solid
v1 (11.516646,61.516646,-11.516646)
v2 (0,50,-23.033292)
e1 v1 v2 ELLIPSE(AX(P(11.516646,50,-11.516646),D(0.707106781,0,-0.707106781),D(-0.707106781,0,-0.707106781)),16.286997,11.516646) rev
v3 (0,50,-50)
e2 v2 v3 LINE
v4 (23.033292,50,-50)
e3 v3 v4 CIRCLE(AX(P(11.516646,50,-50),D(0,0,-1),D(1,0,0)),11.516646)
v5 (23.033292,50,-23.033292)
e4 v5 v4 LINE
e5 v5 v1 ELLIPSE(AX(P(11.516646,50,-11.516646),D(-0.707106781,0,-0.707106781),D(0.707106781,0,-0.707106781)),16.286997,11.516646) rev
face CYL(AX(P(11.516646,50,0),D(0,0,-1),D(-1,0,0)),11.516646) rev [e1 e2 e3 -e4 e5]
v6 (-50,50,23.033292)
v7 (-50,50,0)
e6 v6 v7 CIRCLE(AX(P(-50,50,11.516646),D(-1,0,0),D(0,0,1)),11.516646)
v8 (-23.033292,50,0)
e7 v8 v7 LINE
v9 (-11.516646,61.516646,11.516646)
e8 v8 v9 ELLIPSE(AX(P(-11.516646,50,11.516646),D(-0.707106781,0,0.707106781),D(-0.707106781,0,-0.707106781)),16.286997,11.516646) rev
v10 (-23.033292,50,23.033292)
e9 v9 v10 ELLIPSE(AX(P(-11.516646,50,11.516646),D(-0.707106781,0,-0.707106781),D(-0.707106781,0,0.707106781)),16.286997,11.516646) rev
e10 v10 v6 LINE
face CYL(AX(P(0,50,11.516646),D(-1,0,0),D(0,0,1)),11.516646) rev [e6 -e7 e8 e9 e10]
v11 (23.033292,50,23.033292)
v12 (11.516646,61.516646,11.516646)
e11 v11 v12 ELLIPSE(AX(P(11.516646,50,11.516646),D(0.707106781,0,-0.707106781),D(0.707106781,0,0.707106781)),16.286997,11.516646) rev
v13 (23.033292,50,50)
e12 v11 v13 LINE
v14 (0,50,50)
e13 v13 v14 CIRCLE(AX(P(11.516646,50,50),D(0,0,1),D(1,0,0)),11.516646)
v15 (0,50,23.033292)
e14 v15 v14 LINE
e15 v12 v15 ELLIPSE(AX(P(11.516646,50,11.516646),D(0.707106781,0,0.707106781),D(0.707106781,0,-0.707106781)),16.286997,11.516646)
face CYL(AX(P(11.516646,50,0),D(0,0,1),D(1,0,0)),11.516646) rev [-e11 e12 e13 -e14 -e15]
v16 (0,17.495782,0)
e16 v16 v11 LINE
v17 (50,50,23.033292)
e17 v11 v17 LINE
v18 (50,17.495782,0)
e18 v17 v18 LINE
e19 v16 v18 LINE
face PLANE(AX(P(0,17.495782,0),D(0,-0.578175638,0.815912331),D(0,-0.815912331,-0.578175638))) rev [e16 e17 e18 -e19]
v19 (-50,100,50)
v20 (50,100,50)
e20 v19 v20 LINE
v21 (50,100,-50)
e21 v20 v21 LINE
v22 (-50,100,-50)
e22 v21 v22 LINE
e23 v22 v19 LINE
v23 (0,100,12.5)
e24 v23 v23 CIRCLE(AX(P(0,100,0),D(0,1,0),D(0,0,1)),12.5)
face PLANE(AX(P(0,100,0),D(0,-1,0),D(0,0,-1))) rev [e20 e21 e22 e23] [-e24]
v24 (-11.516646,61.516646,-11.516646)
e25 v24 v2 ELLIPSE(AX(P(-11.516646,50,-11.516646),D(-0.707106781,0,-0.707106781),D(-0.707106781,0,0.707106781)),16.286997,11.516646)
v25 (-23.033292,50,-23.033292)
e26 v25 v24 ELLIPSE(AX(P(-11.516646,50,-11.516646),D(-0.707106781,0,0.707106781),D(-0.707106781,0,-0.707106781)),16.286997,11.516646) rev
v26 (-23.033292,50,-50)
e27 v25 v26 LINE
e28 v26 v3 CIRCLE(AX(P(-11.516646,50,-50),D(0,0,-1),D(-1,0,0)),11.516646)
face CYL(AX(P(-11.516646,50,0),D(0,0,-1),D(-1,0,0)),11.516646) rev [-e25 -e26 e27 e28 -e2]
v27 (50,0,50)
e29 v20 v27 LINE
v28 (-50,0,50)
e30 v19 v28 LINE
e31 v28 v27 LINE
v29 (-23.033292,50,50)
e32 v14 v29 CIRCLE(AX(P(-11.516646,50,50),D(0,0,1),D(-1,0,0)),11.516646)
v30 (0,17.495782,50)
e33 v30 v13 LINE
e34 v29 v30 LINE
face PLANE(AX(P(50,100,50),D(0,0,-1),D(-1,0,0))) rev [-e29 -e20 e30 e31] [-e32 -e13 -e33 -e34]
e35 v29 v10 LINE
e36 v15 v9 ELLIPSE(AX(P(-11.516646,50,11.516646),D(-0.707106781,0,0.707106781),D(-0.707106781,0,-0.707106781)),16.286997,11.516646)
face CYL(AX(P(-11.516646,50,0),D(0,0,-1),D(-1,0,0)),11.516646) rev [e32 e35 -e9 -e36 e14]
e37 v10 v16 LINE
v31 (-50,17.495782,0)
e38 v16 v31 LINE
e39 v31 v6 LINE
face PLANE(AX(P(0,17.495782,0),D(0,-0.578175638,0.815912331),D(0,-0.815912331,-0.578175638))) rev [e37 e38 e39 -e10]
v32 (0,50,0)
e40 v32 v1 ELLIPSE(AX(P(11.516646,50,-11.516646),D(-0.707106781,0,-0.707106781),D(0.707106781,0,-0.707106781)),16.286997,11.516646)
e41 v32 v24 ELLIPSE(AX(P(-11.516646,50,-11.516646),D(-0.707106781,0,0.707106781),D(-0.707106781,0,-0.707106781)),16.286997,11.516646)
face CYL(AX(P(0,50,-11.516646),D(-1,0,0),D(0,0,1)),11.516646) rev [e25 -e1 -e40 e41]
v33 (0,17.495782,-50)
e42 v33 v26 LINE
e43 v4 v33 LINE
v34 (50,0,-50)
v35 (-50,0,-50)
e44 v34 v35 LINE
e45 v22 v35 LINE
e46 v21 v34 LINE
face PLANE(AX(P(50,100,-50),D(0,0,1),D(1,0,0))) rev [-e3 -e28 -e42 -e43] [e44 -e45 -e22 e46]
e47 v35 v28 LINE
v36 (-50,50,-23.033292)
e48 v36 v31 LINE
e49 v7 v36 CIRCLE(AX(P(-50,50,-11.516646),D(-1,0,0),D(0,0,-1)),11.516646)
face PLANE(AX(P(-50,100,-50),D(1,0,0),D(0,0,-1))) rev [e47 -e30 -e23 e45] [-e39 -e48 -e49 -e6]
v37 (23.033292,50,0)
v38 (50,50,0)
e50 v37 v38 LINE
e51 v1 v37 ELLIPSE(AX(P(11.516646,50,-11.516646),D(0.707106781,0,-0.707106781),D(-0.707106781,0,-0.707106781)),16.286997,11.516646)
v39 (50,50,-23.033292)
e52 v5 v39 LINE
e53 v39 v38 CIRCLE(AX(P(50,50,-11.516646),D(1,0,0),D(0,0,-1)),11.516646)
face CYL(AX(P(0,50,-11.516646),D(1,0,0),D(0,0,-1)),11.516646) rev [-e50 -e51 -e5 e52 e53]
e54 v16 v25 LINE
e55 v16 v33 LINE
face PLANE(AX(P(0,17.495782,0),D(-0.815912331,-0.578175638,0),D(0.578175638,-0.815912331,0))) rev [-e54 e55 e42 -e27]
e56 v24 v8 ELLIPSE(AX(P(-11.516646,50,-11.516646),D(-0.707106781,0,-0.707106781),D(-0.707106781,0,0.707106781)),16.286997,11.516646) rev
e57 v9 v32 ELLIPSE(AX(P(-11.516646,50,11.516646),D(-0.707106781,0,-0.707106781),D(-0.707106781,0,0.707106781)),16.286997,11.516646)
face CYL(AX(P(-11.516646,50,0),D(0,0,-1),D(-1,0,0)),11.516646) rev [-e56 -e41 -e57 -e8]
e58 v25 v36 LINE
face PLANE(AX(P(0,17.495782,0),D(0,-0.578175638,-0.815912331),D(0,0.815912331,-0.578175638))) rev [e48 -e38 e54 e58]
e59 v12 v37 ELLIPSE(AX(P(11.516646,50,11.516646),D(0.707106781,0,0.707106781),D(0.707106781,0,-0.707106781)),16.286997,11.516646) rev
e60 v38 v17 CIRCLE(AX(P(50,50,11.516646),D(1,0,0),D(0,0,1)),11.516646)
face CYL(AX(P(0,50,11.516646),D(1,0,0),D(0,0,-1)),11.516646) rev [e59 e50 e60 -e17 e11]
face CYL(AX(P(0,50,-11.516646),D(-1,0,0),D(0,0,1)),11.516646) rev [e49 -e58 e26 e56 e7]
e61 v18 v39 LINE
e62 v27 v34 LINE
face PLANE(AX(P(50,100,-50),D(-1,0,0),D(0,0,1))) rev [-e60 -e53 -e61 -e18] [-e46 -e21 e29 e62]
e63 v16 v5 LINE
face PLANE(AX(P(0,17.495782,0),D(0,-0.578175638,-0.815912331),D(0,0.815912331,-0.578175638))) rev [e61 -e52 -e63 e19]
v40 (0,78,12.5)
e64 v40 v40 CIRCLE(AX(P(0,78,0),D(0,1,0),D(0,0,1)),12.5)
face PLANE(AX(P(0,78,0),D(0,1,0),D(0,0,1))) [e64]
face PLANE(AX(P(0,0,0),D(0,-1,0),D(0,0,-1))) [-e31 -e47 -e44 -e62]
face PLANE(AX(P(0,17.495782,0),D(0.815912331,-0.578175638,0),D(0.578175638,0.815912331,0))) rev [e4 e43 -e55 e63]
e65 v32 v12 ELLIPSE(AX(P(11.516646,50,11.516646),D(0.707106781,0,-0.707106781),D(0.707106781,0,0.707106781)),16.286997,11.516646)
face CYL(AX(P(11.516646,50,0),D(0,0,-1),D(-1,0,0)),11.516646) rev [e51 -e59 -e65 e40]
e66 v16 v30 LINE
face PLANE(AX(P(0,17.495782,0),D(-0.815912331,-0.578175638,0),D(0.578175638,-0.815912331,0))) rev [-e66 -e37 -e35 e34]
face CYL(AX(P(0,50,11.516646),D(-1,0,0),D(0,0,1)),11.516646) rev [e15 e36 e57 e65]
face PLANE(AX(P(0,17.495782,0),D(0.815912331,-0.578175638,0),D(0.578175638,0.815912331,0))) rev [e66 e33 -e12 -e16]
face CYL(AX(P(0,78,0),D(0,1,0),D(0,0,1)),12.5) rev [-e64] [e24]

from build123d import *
from build123d.topology import SkipClean

# Parameters (mm, degrees)
SKETCH1_W           = 100
SKETCH1_H           = 100
BOSS_EXTRUDE1_DEPTH = 100
CUT_EXTRUDE1_DEPTH  = 50
CIRPATTERN1_START   = -50
CIRPATTERN1_DEPTH   = 100
CIRPATTERN1_2_DEPTH = 50
SKETCH3_R           = 12.5
CUT_EXTRUDE2_DEPTH  = 22


with BuildPart() as part:
    # Sketch1 → Boss-Extrude1 (new body)
    with BuildSketch(Plane(origin=(0, 0, 0), x_dir=(1, 0, 0), z_dir=(0, 1, 0))):
        Rectangle(SKETCH1_W, SKETCH1_H)
    extrude(amount=BOSS_EXTRUDE1_DEPTH)

    # Sketch2 → Cut-Extrude1 (cut)
    with BuildSketch(Plane.ZY.offset(50)):
        with BuildLine():
            Line((0, 17.495781671), (-23.033292242, 50))
            ThreePointArc((-23.033292242, 50), (-11.516646121, 61.516646121), (0, 50))
            ThreePointArc((0, 50), (11.516646121, 61.516646121), (23.033292242, 50))
            Line((23.033292242, 50), (0, 17.495781671))
        make_face()
    extrude(amount=-CUT_EXTRUDE1_DEPTH, mode=Mode.SUBTRACT)

    # CirPattern1: read off the stored shape, not the designer's step
    # CirPattern1 outline → CirPattern1 (cut)
    with SkipClean():  # the faces are left unmerged after this step: merging them gives an invalid solid
        with BuildSketch(Plane.XY.offset(CIRPATTERN1_START)):
            with BuildLine():
                Line((-23.033292242, 50), (0, 17.495781671))
                Line((0, 17.495781671), (23.033292242, 50))
                ThreePointArc((23.033292242, 50), (11.516646121, 61.516646121), (0, 50))
                ThreePointArc((0, 50), (-11.516646121, 61.516646121), (-23.033292242, 50))
            make_face()
        extrude(amount=CIRPATTERN1_DEPTH, mode=Mode.SUBTRACT)

    # CirPattern1 2 outline → CirPattern1 2 (cut)
    with SkipClean():  # the faces are left unmerged after this step: merging them gives an invalid solid
        with BuildSketch(Plane.YZ):
            with BuildLine():
                Line((17.495781671, 0), (50, -23.033292242))
                ThreePointArc((50, -23.033292242), (61.516646121, -11.516646121), (50, 0))
                ThreePointArc((50, 0), (61.516646121, 11.516646121), (50, 23.033292242))
                Line((50, 23.033292242), (17.495781671, 0))
            make_face()
        extrude(amount=CIRPATTERN1_2_DEPTH, mode=Mode.SUBTRACT)

    # Sketch3 → Cut-Extrude2 (cut)
    with SkipClean():  # the faces are left unmerged after this step: merging them gives an invalid solid
        with BuildSketch(Plane(origin=(0, 100, 0), x_dir=(1, 0, 0), z_dir=(0, 1, 0))):
            with Locations(Location((0, 0, 0), (0, 0, 270))):
                Circle(SKETCH3_R)
        extrude(amount=-CUT_EXTRUDE2_DEPTH, mode=Mode.SUBTRACT)


solid = part.part
